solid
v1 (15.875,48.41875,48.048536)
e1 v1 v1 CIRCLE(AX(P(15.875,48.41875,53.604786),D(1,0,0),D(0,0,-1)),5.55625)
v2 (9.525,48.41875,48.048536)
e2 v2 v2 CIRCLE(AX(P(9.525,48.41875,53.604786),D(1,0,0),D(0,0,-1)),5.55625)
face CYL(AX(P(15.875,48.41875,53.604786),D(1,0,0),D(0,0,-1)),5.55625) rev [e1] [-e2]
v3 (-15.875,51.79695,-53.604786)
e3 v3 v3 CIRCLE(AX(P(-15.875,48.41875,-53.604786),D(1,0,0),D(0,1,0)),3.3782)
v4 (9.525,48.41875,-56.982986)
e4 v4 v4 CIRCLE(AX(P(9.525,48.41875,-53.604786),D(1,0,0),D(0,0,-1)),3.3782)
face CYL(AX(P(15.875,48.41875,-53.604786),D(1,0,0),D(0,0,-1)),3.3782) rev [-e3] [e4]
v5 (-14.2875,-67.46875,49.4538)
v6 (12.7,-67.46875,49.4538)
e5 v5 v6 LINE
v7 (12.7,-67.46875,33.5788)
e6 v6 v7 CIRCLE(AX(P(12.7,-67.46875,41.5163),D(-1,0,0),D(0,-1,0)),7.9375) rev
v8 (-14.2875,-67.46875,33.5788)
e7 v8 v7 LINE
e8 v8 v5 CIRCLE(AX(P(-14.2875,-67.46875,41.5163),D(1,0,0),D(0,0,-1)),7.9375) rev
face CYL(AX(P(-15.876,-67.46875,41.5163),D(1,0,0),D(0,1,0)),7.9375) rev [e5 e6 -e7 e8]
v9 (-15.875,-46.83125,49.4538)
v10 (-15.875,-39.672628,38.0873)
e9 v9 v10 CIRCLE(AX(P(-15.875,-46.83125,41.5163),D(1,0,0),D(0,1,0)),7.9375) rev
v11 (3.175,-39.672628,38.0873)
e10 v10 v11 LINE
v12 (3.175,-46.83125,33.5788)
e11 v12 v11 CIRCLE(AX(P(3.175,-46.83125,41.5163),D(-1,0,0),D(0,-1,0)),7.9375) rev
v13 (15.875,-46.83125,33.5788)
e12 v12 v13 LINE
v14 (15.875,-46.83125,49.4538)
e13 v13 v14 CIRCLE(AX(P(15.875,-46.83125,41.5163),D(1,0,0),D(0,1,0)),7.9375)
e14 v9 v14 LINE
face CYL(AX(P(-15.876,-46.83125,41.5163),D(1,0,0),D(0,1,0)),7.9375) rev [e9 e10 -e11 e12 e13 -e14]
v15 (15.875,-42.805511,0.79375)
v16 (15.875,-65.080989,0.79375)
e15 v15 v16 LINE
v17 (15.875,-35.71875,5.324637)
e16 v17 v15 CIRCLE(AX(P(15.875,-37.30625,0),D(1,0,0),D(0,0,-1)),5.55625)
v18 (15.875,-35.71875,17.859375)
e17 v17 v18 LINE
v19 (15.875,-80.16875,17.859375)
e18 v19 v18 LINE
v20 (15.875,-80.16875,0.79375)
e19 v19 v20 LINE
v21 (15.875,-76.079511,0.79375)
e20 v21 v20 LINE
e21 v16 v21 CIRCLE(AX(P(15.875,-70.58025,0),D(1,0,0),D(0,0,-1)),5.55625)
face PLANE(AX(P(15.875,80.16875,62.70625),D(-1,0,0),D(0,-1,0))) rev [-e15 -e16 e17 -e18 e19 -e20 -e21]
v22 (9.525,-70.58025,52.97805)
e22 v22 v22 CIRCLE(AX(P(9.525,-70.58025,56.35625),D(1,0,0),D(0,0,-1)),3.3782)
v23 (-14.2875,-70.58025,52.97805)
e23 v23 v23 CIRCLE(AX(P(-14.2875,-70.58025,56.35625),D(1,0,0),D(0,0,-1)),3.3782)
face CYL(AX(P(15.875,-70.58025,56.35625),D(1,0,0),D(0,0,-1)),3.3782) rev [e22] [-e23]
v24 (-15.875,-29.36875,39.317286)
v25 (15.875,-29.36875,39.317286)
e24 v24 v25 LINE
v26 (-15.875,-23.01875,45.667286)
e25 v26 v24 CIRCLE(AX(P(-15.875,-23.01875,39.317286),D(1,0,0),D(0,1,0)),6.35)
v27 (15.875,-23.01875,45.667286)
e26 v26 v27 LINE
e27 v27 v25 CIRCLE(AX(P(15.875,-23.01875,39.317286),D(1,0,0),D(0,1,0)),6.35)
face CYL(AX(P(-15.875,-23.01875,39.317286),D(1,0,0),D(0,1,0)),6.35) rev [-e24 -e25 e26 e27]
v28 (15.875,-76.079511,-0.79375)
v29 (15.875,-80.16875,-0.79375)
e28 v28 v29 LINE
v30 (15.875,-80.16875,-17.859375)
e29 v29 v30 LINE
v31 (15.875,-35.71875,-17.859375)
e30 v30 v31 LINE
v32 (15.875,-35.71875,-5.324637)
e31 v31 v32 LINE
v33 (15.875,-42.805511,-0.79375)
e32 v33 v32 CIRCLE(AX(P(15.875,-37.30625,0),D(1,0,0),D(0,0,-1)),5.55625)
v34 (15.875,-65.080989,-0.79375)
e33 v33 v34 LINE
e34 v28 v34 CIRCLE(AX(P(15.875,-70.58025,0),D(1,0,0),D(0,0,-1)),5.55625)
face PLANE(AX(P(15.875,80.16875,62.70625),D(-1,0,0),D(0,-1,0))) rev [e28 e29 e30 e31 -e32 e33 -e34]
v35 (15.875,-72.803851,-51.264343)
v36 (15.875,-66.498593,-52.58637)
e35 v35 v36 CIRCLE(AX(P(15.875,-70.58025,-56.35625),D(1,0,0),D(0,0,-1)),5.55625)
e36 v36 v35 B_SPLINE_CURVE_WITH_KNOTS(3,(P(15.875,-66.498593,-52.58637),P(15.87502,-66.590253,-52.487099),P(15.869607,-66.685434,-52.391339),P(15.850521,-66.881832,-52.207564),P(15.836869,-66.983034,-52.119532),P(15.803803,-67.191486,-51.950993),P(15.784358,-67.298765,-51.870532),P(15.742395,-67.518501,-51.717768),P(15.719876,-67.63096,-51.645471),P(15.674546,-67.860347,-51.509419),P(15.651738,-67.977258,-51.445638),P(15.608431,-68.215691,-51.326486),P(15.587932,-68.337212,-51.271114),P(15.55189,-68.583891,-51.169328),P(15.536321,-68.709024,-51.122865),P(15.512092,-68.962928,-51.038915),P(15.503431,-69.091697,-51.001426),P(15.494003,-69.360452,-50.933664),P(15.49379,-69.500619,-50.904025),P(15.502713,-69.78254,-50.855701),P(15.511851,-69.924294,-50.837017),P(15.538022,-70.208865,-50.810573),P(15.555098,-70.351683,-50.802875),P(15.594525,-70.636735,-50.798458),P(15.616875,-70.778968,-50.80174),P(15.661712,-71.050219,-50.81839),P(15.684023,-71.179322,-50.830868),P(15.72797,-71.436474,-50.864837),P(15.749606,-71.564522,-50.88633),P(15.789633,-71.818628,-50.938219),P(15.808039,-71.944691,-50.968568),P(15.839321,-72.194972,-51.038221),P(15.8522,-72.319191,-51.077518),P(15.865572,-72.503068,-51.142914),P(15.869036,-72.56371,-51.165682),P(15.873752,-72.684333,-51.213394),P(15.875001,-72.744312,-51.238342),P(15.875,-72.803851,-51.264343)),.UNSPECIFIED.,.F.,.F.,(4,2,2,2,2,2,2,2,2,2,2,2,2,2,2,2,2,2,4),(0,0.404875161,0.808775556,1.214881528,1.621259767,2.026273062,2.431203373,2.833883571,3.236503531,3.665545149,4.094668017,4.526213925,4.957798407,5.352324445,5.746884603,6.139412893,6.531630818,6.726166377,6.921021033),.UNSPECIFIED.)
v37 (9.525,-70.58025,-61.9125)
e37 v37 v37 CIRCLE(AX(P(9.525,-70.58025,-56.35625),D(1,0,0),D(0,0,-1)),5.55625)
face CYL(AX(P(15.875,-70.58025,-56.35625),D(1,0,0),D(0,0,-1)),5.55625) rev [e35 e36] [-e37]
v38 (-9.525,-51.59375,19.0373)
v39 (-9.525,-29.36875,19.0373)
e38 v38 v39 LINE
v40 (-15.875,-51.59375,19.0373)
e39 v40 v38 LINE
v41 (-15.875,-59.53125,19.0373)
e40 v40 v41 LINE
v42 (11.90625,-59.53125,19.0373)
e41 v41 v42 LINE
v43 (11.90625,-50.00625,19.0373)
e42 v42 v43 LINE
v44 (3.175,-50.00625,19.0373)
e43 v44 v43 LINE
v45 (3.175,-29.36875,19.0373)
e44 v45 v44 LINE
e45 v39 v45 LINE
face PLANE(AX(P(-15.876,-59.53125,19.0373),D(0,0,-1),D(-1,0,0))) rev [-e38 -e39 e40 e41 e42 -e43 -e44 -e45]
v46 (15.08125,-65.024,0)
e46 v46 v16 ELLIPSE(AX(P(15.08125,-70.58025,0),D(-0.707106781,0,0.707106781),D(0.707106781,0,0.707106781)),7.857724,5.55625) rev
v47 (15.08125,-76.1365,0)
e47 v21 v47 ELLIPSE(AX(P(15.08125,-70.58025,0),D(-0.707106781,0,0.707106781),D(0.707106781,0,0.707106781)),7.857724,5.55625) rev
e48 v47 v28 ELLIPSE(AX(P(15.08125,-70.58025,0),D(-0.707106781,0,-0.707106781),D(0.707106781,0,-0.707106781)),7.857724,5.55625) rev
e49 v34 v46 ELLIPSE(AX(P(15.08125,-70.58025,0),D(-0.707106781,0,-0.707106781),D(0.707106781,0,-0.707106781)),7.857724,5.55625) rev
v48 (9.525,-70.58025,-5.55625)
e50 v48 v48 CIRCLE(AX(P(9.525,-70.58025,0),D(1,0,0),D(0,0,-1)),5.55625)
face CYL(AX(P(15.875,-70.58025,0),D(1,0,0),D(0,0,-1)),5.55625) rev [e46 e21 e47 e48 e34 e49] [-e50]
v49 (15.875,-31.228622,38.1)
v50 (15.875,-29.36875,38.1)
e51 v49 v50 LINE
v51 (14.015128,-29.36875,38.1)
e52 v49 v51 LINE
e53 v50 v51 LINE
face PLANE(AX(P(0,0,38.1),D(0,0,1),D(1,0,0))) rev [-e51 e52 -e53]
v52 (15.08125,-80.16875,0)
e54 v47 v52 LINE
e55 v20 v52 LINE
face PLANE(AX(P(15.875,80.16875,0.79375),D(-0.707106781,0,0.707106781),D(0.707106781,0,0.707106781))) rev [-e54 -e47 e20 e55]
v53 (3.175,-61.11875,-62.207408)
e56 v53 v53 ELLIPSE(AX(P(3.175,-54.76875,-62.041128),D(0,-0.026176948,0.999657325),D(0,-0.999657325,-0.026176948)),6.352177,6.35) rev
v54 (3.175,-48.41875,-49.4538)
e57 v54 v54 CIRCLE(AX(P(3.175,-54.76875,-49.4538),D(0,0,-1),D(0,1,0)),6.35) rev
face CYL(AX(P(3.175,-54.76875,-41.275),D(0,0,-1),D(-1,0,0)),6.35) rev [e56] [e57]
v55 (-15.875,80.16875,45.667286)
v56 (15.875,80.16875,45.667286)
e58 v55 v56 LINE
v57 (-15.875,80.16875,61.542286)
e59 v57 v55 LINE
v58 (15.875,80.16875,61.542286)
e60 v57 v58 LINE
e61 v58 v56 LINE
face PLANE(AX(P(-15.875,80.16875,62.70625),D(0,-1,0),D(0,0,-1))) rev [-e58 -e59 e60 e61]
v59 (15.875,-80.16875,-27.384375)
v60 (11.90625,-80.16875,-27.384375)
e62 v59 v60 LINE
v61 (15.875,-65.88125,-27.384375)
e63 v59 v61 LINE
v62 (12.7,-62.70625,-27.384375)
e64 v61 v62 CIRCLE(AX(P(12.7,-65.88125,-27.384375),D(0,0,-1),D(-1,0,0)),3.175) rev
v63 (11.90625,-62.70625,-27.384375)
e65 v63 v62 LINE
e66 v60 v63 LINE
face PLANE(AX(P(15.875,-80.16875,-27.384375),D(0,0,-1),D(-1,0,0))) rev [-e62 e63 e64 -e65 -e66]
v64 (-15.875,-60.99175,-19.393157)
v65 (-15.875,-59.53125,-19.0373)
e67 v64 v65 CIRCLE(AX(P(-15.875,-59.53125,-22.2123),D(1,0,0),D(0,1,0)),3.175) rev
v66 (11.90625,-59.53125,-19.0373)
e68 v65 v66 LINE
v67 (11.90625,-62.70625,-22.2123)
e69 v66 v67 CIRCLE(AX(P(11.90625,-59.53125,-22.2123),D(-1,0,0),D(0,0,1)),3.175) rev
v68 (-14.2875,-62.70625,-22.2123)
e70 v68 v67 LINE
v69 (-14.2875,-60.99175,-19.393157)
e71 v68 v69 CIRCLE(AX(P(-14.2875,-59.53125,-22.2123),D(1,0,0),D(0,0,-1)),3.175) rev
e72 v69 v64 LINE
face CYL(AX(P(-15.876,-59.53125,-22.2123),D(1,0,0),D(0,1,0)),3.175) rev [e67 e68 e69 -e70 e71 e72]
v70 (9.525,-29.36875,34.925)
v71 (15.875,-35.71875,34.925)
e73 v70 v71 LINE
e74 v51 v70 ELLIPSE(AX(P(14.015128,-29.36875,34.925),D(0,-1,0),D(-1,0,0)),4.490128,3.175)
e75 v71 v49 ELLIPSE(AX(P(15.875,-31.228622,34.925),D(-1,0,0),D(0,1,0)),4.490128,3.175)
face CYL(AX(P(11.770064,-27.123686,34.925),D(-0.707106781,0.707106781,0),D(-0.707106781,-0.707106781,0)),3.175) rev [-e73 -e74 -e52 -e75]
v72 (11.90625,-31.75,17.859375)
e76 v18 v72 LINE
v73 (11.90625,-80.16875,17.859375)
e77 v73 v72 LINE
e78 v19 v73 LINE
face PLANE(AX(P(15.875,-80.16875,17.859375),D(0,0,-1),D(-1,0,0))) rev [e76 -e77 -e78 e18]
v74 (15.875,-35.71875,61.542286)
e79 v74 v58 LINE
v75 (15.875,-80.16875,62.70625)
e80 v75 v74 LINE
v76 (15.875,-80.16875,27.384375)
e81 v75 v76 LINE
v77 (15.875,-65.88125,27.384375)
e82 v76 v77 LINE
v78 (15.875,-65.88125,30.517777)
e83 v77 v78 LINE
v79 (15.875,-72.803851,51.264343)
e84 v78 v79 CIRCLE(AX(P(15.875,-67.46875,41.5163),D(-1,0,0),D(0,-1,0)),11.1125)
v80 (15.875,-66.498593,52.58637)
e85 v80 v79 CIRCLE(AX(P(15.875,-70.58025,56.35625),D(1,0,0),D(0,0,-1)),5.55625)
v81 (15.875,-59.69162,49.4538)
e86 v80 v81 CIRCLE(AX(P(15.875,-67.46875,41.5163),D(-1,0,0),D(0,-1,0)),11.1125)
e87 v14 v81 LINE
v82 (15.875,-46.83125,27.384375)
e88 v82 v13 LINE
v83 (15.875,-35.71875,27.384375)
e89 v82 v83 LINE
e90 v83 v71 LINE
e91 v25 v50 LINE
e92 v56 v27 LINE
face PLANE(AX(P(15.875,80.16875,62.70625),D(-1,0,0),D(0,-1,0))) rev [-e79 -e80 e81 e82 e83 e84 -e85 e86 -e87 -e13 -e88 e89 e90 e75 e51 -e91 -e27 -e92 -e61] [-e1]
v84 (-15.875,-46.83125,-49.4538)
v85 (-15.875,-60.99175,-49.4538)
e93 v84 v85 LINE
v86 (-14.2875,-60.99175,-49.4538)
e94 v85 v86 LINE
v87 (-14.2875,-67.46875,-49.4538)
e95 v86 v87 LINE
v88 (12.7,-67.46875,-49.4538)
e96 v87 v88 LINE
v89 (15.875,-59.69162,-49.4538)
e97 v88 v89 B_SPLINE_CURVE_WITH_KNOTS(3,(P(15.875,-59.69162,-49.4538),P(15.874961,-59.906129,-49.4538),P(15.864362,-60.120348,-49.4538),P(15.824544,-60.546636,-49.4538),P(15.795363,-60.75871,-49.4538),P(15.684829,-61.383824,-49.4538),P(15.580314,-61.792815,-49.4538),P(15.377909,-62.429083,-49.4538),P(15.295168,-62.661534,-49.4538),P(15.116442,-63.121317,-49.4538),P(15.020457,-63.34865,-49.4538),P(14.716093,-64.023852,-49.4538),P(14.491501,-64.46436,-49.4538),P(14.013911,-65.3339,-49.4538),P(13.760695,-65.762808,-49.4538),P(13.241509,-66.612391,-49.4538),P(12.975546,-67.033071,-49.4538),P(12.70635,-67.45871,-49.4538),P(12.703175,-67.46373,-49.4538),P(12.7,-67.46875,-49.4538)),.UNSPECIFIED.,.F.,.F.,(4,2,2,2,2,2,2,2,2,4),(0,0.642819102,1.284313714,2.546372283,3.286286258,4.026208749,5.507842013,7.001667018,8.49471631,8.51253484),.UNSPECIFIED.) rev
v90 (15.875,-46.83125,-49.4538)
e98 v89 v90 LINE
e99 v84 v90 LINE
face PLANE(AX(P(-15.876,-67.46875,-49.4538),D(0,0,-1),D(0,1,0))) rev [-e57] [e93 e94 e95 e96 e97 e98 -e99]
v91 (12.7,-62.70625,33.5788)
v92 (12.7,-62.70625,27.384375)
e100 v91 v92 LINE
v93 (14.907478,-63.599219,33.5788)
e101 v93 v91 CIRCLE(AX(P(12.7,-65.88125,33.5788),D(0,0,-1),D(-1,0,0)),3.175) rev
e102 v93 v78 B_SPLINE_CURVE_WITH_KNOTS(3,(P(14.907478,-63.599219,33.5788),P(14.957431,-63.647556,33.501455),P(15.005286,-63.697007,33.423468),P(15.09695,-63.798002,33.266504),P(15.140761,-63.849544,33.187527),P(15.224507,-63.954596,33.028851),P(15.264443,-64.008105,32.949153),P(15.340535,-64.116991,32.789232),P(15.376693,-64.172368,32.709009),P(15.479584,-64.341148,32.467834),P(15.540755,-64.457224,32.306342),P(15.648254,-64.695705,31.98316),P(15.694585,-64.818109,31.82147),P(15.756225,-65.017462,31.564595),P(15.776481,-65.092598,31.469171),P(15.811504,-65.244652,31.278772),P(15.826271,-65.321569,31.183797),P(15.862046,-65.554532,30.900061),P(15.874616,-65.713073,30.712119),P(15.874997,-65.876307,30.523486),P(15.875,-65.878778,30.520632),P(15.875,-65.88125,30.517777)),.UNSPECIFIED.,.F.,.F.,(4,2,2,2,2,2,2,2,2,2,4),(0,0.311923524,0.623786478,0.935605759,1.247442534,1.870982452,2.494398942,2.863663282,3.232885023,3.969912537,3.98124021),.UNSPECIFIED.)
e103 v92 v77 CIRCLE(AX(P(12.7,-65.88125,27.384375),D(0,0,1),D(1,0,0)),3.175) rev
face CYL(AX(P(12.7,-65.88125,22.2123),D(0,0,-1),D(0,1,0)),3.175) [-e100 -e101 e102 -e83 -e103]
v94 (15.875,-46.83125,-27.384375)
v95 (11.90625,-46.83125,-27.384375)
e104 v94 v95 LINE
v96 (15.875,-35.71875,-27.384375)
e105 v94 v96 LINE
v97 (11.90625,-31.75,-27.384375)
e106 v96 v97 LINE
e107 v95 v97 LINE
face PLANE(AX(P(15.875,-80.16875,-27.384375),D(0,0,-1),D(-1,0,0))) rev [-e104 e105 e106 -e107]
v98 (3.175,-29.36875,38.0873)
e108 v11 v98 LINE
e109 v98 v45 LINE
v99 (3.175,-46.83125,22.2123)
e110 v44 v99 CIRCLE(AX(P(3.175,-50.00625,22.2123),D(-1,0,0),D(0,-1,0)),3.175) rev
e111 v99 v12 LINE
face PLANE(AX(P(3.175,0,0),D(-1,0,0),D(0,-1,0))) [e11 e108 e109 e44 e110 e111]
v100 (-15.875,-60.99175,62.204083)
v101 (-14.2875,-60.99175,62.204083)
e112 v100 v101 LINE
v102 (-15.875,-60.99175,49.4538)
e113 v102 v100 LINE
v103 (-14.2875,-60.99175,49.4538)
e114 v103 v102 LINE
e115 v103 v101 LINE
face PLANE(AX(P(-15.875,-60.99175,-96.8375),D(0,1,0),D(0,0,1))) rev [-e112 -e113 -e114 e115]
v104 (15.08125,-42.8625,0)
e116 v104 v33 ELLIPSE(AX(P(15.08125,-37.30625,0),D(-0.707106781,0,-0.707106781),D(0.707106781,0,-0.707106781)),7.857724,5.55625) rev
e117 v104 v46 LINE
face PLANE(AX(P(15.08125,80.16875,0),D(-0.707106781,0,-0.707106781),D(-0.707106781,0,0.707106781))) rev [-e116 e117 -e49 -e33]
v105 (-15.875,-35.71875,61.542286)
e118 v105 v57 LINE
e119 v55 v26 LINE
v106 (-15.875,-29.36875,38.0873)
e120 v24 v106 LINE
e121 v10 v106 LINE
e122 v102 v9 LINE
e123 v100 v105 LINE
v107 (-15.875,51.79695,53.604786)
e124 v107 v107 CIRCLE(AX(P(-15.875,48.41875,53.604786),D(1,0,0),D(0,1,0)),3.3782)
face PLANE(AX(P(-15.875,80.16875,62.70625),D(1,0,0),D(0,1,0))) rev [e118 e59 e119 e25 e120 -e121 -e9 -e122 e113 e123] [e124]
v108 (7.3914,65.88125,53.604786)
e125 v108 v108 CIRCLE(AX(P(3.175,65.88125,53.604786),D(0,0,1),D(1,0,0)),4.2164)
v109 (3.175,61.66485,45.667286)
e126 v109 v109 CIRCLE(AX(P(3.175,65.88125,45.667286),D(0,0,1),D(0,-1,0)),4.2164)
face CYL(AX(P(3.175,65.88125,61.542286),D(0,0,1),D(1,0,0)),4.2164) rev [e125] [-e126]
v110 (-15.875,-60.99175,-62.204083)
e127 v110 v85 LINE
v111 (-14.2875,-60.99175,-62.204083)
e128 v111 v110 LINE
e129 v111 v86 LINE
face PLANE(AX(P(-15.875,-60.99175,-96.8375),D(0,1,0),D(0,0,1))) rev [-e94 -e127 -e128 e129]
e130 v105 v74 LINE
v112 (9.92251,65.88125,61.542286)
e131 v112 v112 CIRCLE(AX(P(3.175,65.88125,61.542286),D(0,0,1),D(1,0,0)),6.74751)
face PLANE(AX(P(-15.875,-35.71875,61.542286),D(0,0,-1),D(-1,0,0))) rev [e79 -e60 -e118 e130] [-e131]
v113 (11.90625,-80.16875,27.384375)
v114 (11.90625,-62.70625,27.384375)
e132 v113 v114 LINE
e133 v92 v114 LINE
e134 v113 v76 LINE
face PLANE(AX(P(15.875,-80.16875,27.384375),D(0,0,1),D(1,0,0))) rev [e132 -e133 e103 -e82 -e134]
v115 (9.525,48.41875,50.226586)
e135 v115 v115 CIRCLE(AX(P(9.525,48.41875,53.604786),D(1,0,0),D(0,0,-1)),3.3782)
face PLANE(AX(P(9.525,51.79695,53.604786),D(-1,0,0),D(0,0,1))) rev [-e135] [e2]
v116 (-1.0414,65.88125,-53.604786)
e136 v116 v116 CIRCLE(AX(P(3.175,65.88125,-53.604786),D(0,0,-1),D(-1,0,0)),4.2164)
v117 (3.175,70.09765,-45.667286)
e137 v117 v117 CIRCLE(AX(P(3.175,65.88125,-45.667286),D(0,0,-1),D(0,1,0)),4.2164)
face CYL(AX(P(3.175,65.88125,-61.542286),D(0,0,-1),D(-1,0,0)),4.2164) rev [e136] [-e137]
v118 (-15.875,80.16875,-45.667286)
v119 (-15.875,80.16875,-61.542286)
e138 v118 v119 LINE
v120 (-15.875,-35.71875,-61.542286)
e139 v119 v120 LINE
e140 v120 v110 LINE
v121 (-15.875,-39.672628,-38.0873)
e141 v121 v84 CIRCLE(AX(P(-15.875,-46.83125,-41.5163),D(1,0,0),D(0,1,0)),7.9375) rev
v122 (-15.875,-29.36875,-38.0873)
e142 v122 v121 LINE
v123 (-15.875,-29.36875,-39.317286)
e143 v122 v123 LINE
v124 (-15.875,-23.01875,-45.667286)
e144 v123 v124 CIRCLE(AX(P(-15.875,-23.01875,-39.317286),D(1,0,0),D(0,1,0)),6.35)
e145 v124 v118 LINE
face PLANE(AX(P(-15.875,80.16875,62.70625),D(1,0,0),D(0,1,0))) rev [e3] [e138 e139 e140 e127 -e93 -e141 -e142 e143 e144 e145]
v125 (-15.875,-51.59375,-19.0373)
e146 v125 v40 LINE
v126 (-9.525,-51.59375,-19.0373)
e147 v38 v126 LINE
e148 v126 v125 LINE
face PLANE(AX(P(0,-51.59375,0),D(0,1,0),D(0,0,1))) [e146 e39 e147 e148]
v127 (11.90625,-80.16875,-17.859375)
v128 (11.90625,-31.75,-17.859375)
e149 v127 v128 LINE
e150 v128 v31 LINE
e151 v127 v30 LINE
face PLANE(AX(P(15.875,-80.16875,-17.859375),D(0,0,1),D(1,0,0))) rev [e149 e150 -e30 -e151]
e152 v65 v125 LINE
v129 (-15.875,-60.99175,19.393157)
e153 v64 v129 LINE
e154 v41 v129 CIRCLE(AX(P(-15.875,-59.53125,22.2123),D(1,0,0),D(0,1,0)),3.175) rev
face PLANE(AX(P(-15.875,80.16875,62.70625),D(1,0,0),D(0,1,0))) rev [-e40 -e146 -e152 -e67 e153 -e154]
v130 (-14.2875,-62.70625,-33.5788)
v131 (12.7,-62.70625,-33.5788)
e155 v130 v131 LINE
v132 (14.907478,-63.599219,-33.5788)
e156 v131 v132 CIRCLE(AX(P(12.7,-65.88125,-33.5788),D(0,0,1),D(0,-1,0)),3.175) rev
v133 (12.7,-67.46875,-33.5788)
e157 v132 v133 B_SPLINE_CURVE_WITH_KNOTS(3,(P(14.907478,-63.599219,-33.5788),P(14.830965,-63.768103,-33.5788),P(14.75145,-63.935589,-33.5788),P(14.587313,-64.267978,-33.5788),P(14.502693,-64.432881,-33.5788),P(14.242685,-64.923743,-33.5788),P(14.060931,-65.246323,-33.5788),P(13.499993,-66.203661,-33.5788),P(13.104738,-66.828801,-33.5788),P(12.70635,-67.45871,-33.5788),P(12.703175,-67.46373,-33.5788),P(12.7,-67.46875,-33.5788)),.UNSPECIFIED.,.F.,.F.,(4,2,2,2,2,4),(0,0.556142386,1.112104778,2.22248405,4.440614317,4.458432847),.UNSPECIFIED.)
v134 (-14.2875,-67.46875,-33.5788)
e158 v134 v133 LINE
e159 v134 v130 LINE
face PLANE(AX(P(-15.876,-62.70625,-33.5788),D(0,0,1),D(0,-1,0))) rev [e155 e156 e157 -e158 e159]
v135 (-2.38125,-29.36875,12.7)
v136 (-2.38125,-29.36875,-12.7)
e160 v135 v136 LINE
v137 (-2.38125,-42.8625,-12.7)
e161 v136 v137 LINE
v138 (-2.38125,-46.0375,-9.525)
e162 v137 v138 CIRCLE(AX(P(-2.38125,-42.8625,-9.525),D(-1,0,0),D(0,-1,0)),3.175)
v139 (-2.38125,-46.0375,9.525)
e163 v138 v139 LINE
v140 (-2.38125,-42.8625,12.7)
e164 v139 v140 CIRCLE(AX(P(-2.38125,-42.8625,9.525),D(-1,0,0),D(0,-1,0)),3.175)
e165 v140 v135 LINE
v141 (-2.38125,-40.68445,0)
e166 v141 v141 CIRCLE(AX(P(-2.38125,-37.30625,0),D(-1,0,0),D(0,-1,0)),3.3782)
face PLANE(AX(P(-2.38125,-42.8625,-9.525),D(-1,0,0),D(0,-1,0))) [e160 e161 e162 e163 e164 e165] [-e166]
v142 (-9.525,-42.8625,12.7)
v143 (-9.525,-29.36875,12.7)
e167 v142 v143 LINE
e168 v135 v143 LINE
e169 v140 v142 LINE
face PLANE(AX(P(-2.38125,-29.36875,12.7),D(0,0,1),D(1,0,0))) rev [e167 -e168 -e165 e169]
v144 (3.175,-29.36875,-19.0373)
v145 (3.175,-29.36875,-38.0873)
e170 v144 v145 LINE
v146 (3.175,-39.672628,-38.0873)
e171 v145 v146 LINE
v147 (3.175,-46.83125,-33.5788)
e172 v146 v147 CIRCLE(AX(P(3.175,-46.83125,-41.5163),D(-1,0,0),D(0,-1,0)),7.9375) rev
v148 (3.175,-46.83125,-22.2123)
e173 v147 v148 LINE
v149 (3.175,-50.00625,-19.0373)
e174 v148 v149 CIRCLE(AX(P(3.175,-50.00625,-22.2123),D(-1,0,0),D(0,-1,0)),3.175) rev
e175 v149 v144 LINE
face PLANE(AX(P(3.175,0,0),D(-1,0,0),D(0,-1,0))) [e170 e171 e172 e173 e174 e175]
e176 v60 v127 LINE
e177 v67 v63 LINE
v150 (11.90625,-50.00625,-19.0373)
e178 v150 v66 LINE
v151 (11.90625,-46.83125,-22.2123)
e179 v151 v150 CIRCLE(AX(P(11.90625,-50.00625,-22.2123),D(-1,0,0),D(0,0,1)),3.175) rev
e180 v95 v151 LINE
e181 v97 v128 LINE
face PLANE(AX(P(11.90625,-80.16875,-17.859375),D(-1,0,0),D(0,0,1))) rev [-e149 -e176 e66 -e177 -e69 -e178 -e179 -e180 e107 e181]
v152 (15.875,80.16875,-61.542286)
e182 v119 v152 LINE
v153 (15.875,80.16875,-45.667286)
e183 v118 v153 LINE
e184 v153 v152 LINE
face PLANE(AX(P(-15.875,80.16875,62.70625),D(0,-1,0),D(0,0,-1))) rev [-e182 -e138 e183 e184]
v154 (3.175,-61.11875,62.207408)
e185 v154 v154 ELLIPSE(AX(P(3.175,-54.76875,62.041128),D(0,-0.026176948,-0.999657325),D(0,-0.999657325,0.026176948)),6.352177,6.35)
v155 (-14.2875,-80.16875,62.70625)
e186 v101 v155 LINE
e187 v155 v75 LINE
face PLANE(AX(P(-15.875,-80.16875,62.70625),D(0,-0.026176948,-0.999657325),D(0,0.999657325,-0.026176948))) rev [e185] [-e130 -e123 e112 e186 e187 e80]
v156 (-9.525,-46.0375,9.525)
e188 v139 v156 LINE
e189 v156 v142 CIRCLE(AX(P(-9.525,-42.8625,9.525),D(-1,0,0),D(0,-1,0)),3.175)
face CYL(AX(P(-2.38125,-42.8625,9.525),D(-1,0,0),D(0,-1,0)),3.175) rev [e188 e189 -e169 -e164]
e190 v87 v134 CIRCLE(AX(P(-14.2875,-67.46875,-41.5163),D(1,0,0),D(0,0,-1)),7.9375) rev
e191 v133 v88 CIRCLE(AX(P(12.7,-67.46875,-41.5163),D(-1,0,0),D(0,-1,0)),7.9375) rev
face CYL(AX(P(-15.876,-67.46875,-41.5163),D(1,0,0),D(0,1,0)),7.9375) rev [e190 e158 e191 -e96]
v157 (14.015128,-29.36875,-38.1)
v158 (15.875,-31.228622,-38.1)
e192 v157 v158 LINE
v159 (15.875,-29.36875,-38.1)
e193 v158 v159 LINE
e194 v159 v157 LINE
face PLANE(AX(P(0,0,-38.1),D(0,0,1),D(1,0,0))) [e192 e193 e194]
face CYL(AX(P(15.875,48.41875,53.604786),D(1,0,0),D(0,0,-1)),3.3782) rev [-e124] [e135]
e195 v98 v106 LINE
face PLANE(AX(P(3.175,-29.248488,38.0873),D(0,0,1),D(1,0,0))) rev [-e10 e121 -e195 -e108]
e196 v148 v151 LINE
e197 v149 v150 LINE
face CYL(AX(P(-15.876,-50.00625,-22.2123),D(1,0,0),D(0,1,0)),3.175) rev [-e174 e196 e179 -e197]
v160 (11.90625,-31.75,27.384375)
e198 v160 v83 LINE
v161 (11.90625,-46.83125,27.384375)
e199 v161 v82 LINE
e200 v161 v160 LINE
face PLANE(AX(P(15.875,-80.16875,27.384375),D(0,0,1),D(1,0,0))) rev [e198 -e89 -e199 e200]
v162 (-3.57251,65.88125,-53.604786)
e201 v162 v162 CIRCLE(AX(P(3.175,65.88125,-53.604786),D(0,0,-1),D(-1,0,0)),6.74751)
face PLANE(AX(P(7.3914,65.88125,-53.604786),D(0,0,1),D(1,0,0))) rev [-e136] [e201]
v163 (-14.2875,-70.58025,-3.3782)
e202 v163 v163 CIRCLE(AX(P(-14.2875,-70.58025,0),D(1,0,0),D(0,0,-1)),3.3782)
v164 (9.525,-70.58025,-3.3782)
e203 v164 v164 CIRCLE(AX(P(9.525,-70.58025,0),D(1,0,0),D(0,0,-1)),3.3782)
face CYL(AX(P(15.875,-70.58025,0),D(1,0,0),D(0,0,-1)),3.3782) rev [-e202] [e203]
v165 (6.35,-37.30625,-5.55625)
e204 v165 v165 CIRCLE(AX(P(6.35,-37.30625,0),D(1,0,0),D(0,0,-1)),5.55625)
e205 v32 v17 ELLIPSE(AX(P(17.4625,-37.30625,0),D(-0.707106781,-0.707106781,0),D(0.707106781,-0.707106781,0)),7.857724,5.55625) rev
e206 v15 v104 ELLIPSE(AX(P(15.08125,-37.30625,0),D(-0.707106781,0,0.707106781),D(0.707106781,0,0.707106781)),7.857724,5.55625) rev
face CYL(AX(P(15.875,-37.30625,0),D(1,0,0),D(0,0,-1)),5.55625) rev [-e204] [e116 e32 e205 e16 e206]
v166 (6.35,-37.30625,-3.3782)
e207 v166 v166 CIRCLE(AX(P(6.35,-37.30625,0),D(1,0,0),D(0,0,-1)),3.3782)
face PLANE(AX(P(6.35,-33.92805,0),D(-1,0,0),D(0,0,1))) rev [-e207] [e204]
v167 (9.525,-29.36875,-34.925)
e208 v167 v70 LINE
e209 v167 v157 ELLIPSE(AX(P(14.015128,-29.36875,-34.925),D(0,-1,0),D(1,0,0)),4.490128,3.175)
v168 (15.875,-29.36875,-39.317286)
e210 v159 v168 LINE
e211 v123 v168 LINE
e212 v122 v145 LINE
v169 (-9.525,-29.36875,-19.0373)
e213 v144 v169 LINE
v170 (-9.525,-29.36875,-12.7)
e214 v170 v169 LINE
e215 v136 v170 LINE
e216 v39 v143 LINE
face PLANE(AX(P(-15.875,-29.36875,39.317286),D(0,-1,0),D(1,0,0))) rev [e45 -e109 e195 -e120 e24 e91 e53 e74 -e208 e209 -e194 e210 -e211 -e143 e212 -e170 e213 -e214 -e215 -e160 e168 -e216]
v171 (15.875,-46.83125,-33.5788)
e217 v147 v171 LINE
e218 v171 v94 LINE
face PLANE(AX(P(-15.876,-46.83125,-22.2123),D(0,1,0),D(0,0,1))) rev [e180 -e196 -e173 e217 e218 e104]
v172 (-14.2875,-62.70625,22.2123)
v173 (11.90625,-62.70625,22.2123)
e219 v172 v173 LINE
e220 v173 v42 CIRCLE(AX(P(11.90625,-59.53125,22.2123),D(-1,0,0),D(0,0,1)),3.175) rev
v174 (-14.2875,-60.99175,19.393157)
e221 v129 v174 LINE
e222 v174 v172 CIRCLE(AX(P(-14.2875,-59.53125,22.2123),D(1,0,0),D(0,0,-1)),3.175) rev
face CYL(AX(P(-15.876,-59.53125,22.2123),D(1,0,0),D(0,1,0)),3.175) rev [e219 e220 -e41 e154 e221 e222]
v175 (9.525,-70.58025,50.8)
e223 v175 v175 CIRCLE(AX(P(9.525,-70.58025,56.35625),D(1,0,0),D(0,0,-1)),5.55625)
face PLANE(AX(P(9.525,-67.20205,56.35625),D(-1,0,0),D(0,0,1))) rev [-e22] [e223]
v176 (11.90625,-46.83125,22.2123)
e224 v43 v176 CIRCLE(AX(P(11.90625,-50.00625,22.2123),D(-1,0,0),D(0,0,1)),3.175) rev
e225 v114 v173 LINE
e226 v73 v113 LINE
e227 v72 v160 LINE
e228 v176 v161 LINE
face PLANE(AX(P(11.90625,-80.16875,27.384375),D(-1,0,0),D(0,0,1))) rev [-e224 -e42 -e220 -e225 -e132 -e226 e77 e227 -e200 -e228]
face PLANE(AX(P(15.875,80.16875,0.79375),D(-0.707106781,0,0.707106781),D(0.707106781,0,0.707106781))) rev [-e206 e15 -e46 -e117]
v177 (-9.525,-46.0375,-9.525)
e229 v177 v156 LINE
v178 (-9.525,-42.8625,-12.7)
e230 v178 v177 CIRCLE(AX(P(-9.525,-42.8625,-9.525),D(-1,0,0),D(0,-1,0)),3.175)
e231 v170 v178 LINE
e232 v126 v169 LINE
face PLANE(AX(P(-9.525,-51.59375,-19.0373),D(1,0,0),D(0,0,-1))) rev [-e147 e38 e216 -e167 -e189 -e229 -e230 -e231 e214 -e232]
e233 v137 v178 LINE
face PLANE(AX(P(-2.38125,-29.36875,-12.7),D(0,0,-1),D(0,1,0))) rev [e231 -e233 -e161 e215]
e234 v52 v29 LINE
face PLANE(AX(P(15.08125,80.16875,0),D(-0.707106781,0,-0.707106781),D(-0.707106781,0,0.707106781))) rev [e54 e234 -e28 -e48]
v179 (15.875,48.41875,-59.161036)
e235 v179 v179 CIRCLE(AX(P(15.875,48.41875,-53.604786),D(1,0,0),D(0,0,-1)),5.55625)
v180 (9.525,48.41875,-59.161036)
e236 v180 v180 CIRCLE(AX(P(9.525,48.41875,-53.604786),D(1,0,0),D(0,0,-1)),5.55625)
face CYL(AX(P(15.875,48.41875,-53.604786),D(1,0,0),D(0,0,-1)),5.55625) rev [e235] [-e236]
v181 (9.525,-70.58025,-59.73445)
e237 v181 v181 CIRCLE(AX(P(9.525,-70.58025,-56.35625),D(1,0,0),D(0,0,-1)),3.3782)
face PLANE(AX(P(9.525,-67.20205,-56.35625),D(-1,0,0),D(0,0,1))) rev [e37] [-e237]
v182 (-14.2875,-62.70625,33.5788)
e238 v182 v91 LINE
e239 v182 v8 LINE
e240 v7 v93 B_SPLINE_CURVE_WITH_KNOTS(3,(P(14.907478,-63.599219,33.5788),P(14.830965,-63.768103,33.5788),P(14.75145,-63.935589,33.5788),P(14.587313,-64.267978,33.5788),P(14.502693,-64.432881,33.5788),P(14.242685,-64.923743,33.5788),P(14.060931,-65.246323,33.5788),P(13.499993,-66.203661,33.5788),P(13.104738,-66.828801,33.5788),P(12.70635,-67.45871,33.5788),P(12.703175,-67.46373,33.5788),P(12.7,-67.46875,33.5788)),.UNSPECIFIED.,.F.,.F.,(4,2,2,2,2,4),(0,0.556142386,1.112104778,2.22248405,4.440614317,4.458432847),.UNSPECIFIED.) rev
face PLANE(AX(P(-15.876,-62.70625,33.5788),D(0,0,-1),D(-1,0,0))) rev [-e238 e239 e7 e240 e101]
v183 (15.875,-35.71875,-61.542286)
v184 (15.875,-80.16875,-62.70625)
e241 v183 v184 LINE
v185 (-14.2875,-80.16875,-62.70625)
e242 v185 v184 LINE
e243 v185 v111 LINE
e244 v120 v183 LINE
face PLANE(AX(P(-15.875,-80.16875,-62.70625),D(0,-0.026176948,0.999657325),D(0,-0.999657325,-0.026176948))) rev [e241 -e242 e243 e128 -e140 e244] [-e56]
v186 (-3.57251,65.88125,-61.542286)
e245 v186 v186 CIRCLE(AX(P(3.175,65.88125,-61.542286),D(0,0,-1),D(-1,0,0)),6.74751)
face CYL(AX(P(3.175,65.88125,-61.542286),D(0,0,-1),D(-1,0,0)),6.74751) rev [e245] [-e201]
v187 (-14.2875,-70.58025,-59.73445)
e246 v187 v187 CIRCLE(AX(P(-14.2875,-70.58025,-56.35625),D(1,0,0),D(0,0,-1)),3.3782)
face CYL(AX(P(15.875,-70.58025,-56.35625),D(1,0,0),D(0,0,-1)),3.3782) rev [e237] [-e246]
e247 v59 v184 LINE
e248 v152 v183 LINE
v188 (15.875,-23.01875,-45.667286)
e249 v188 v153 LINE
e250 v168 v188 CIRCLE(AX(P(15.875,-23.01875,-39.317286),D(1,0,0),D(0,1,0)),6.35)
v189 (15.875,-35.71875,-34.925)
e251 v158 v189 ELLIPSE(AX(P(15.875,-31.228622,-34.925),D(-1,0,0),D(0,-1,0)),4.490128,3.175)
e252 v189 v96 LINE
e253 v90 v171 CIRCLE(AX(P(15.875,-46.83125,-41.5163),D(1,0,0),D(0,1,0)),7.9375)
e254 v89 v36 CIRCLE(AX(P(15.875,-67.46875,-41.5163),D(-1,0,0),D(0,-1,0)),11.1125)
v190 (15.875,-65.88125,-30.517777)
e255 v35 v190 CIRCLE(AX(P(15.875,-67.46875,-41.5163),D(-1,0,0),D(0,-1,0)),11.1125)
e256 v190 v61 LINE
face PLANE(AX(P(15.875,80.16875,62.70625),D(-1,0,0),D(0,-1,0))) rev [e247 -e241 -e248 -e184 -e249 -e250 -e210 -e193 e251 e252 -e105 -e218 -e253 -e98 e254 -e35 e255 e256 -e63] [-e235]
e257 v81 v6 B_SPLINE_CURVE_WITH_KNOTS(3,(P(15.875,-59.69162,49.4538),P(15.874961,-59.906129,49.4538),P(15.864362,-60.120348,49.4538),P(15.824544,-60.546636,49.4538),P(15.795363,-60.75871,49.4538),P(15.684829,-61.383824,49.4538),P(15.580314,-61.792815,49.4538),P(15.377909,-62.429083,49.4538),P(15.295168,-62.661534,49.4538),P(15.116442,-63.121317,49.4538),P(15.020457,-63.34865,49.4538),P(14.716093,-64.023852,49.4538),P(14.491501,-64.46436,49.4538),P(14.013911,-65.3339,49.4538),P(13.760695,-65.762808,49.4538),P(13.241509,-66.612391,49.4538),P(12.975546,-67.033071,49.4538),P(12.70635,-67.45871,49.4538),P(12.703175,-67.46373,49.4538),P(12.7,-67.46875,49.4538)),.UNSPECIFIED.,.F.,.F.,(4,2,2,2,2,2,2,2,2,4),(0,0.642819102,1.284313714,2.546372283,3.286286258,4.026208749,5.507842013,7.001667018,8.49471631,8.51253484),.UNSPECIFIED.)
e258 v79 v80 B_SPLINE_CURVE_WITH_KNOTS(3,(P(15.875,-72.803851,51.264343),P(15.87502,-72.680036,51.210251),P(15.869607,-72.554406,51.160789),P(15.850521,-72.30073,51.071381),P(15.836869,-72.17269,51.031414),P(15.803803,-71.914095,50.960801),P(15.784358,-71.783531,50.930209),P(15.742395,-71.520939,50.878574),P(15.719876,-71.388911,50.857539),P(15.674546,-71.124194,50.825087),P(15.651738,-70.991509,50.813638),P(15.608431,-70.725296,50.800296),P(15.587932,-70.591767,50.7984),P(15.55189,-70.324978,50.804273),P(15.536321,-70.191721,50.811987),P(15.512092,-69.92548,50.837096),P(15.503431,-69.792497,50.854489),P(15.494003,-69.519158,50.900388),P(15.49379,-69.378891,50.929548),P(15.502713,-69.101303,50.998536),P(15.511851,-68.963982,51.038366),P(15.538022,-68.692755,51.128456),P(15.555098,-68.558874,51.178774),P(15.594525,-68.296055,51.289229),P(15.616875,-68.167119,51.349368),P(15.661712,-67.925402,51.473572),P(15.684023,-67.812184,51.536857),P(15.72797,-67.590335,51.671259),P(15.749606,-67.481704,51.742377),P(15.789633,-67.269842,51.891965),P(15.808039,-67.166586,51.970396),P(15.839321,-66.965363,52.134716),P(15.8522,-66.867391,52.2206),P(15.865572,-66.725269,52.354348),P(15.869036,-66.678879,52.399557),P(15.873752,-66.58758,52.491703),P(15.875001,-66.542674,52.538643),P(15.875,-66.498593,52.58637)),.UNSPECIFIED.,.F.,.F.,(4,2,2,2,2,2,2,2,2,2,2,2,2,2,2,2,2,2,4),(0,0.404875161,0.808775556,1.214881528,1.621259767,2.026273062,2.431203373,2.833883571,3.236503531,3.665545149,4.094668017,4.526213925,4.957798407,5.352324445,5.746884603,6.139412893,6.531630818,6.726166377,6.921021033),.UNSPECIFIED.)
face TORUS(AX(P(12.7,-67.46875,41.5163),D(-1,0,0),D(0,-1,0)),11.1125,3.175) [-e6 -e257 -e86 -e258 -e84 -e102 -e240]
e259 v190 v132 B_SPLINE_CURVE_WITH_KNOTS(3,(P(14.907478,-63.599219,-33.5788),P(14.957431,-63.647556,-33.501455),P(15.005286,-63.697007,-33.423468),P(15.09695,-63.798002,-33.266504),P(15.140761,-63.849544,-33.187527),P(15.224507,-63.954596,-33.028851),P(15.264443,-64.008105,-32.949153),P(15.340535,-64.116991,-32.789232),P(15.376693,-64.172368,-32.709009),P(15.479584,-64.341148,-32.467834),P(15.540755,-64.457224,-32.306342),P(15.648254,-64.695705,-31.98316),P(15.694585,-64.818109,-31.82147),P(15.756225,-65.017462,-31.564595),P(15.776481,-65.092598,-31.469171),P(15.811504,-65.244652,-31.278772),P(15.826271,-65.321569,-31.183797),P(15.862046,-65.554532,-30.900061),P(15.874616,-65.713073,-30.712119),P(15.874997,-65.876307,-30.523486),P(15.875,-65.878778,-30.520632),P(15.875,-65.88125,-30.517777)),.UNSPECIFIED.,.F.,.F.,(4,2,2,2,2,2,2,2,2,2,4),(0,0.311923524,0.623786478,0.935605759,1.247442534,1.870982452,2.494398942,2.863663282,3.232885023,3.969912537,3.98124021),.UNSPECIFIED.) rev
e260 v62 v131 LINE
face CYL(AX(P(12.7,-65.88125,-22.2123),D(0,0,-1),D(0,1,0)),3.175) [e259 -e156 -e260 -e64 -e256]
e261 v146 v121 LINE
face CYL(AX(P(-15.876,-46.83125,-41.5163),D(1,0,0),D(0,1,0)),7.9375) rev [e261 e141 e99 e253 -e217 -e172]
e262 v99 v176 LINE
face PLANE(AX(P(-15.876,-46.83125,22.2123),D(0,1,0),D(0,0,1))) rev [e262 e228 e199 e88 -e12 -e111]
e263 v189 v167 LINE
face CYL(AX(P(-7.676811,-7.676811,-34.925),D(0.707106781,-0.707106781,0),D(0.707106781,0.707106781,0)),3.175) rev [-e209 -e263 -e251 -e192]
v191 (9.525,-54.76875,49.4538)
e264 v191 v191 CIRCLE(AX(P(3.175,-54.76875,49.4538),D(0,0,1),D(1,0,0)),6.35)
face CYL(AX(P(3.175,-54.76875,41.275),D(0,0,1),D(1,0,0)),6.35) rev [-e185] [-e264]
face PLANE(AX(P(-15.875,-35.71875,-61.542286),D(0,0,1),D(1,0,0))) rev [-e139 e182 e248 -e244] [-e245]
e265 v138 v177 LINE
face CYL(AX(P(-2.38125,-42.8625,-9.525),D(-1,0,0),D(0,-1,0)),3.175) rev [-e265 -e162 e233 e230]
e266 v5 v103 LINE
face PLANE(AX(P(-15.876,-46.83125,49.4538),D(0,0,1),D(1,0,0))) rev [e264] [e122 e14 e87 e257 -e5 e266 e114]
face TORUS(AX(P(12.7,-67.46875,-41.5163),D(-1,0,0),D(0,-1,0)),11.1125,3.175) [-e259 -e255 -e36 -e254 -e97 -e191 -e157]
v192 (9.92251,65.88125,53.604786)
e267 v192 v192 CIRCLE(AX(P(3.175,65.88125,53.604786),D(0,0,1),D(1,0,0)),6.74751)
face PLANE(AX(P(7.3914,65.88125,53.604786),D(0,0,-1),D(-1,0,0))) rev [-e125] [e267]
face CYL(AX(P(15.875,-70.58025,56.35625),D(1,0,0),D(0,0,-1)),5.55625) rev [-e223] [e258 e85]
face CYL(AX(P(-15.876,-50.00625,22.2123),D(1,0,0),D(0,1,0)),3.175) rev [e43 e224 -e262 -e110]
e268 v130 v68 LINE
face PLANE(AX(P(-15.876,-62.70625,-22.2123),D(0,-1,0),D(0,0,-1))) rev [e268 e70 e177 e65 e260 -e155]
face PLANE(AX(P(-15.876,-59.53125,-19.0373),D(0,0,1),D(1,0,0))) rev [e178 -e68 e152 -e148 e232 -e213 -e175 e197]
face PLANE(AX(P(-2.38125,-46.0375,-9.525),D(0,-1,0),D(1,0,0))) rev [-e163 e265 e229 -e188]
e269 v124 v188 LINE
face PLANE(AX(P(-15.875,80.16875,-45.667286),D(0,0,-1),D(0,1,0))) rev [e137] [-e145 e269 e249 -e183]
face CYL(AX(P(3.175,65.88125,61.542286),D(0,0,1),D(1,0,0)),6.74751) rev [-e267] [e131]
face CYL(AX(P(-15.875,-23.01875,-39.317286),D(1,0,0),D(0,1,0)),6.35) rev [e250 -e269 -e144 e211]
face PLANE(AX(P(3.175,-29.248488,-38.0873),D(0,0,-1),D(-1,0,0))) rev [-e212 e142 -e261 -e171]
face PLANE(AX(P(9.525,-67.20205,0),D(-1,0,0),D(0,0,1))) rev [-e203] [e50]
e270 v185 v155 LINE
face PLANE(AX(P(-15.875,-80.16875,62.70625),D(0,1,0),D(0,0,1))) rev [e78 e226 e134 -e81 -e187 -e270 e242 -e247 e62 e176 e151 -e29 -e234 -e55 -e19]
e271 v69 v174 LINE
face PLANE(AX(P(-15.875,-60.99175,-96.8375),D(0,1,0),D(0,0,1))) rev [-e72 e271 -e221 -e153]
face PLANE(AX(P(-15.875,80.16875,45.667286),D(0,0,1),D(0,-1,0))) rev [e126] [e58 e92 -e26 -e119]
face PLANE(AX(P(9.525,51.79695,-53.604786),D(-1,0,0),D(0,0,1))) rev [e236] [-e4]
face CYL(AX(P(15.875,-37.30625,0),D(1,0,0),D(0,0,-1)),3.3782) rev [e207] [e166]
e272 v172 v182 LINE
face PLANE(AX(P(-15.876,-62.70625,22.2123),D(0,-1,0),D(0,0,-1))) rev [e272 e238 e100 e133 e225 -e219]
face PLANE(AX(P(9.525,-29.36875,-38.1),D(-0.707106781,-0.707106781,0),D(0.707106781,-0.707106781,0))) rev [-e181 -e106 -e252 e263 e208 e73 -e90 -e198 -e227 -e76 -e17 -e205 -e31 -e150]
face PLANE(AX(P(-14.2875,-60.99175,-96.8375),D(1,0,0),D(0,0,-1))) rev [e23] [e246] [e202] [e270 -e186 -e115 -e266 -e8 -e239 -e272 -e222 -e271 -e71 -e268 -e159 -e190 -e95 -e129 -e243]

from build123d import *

# Parameters (mm, degrees)
SKETCH1_W                                         = 31.75
SKETCH1_H                                         = 160.3375
EXTRUDE1_DEPTH                                    = 62.70625
EXTRUDE2_DEPTH                                    = 107.616906566
EXTRUDE3_REACH                                    = 108.617
SKETCH15_W                                        = 3.96875
SKETCH15_H                                        = 9.525
EXTRUDE6_DEPTH                                    = 173.893618507
CUT_EXTRUDE1_DEPTH                                = 107.616906566
SKETCH17_W                                        = 1.5875
SKETCH17_H                                        = 19.177
CUT_EXTRUDE2_DEPTH                                = 96.8375
CBORE_FOR_1_4_SOCKET_HEAD_CAP_SCREW4_D            = 6.7564
CBORE_FOR_1_4_SOCKET_HEAD_CAP_SCREW4_CBORE_D      = 11.1125
CBORE_FOR_1_4_SOCKET_HEAD_CAP_SCREW4_CBORE_DEPTH  = 6.35
CBORE_FOR_5_16_SOCKET_HEAD_CAP_SCREW2_D           = 8.4328
CBORE_FOR_5_16_SOCKET_HEAD_CAP_SCREW2_DEPTH       = 15.875
CBORE_FOR_5_16_SOCKET_HEAD_CAP_SCREW2_CBORE_D     = 13.49502
CBORE_FOR_5_16_SOCKET_HEAD_CAP_SCREW2_CBORE_DEPTH = 7.9375
CBORE_FOR_5_16_SOCKET_HEAD_CAP_SCREW3_D           = 8.4328
CBORE_FOR_5_16_SOCKET_HEAD_CAP_SCREW3_CBORE_D     = 13.49502
CBORE_FOR_5_16_SOCKET_HEAD_CAP_SCREW3_CBORE_DEPTH = 7.9375
CBORE_FOR_1_4_SOCKET_HEAD_CAP_SCREW2_D            = 6.7564
CBORE_FOR_1_4_SOCKET_HEAD_CAP_SCREW2_CBORE_D      = 11.1125
CBORE_FOR_1_4_SOCKET_HEAD_CAP_SCREW2_CBORE_DEPTH  = 6.35
FILLET1_R                                         = 3.175
SKETCH32_R                                        = 6.35
CUT_EXTRUDE7_DEPTH                                = 22.225
CUT_EXTRUDE8_START                                = 22.225
SKETCH33_R                                        = 6.35
CUT_EXTRUDE8_DEPTH                                = 22.225
SKETCH41_W                                        = 19.05
SKETCH41_H                                        = 25.520262047
CUT_EXTRUDE9_DEPTH                                = 19.05
SKETCH43_W                                        = 6.35
SKETCH43_H                                        = 38.0746
CUT_EXTRUDE11_DEPTH                               = 22.225
CUT_EXTRUDE12_DEPTH                               = 7.14375
CBORE_FOR_1_4_SOCKET_HEAD_CAP_SCREW5_D            = 6.7564
CBORE_FOR_1_4_SOCKET_HEAD_CAP_SCREW5_CBORE_D      = 11.1125
CBORE_FOR_1_4_SOCKET_HEAD_CAP_SCREW5_CBORE_DEPTH  = 9.525
FILLET2_R                                         = 3.175
FILLET3_R                                         = 3.175
CUT_EXTRUDE13_DEPTH                               = 173.893618516
CUT_EXTRUDE14_DEPTH                               = 38.1
FILLET4_R                                         = 3.175


with BuildPart() as part:
    # Sketch1 → Extrude1 (new, symmetric)
    with BuildSketch(Plane.XY):
        Rectangle(SKETCH1_W, SKETCH1_H)
    extrude(amount=EXTRUDE1_DEPTH, both=True)

    # Sketch2 → Extrude2 (cut, through all)
    with BuildSketch(Plane(origin=(15.875, 0, 0), x_dir=(0, 0, -1), z_dir=(1, 0, 0))):
        Polygon((-62.70625, -80.16875), (-61.542285786, -35.71875), (-61.542285786, 80.16875), (-62.70625, 80.16875), align=None)
        Polygon((62.70625, -80.16875), (61.542285786, -35.71875), (61.542285786, 80.16875), (62.70625, 80.16875), align=None)
    extrude(amount=-EXTRUDE2_DEPTH, mode=Mode.SUBTRACT)

    # Sketch3 → Extrude3 (cut, up to next)
    with BuildSketch(Plane(origin=(15.875, 0, 0), x_dir=(0, 0, -1), z_dir=(1, 0, 0)), mode=Mode.PRIVATE) as extrude3_sk1:
        with BuildLine():
            Line((-19.0373, -59.53125), (-19.0373, -50.00625))
            ThreePointArc((-19.0373, -50.00625), (-19.96723597, -47.76118597), (-22.2123, -46.83125))
            Line((-22.2123, -46.83125), (-33.5788, -46.83125))
            ThreePointArc((-33.5788, -46.83125), (-41.5163, -38.89375), (-49.4538, -46.83125))
            Line((-49.4538, -46.83125), (-49.4538, -67.46875))
            ThreePointArc((-49.4538, -67.46875), (-41.5163, -75.40625), (-33.5788, -67.46875))
            Line((-33.5788, -67.46875), (-33.5788, -62.70625))
            Line((-33.5788, -62.70625), (-22.2123, -62.70625))
            ThreePointArc((-22.2123, -62.70625), (-19.96723597, -61.77631403), (-19.0373, -59.53125))
        make_face()
    extrude3_tool1 = extrude(extrude3_sk1.sketch, amount=-EXTRUDE3_REACH, mode=Mode.PRIVATE) & part.part
    # Sketch3 → Extrude3 (cut, up to next)
    with BuildSketch(Plane(origin=(15.875, 0, 0), x_dir=(0, 0, -1), z_dir=(1, 0, 0)), mode=Mode.PRIVATE) as extrude3_sk2:
        with BuildLine():
            Line((49.4538, -67.46875), (49.4538, -46.83125))
            ThreePointArc((49.4538, -46.83125), (41.5163, -38.89375), (33.5788, -46.83125))
            Line((33.5788, -46.83125), (22.2123, -46.83125))
            ThreePointArc((22.2123, -46.83125), (19.96723597, -47.76118597), (19.0373, -50.00625))
            Line((19.0373, -50.00625), (19.0373, -59.53125))
            ThreePointArc((19.0373, -59.53125), (19.96723597, -61.77631403), (22.2123, -62.70625))
            Line((22.2123, -62.70625), (33.5788, -62.70625))
            Line((33.5788, -62.70625), (33.5788, -67.46875))
            ThreePointArc((33.5788, -67.46875), (41.5163, -75.40625), (49.4538, -67.46875))
        make_face()
    extrude3_tool2 = extrude(extrude3_sk2.sketch, amount=-EXTRUDE3_REACH, mode=Mode.PRIVATE) & part.part
    add(extrude3_tool1.solids().sort_by_distance((15.875, -56.432782, 36.973416))[0], mode=Mode.SUBTRACT)
    add(extrude3_tool2.solids().sort_by_distance((15.875, -56.432782, -36.973416))[0], mode=Mode.SUBTRACT)

    # Sketch15 → Extrude6 (cut, through all)
    with BuildSketch(Plane(origin=(0, 80.16875, 0), x_dir=(1, 0, 0), z_dir=(0, 1, 0))):
        with Locations((13.890625, -22.621875)):
            Rectangle(SKETCH15_W, SKETCH15_H)
        with Locations((13.890625, 22.621875)):
            Rectangle(SKETCH15_W, SKETCH15_H)
    extrude(amount=-EXTRUDE6_DEPTH, mode=Mode.SUBTRACT)

    # Sketch16 → Cut-Extrude1 (cut, through all)
    with BuildSketch(Plane(origin=(15.875, 0, 0), x_dir=(0, 0, -1), z_dir=(1, 0, 0))):
        with BuildLine():
            Line((-45.667285786, 80.16875), (45.667285786, 80.16875))
            Line((45.667285786, 80.16875), (45.667285786, -23.01875))
            ThreePointArc((45.667285786, -23.01875), (43.807413847, -27.508878061), (39.317285786, -29.36875))
            Line((39.317285786, -29.36875), (-39.317285786, -29.36875))
            ThreePointArc((-39.317285786, -29.36875), (-43.807413847, -27.508878061), (-45.667285786, -23.01875))
            Line((-45.667285786, -23.01875), (-45.667285786, 80.16875))
        make_face()
    extrude(amount=-CUT_EXTRUDE1_DEPTH, mode=Mode.SUBTRACT)

    # Sketch17 → Cut-Extrude2 (cut, symmetric)
    with BuildSketch(Plane.XY):
        with Locations((-15.08125, -70.58025)):
            Rectangle(SKETCH17_W, SKETCH17_H)
    extrude(amount=CUT_EXTRUDE2_DEPTH, both=True, mode=Mode.SUBTRACT)

    # CBORE for 1/4 Socket Head Cap Screw4 (through all)
    with Locations(Plane(origin=(15.875, 0, 0), x_dir=(0, 0, -1), z_dir=(1, 0, 0))):
        with Locations((-56.35625, -70.58025), (56.35625, -70.58025), (0, -70.58025)):
            CounterBoreHole(CBORE_FOR_1_4_SOCKET_HEAD_CAP_SCREW4_D / 2, CBORE_FOR_1_4_SOCKET_HEAD_CAP_SCREW4_CBORE_D / 2, CBORE_FOR_1_4_SOCKET_HEAD_CAP_SCREW4_CBORE_DEPTH)

    # CBORE for 5/16 Socket Head Cap Screw2
    with Locations(Plane(origin=(0, 0, -61.542285786), x_dir=(-1, 0, 0), z_dir=(0, 0, -1))):
        with Locations((-3.175, 65.88125)):
            CounterBoreHole(CBORE_FOR_5_16_SOCKET_HEAD_CAP_SCREW2_D / 2, CBORE_FOR_5_16_SOCKET_HEAD_CAP_SCREW2_CBORE_D / 2, CBORE_FOR_5_16_SOCKET_HEAD_CAP_SCREW2_CBORE_DEPTH, depth=CBORE_FOR_5_16_SOCKET_HEAD_CAP_SCREW2_DEPTH)

    # CBORE for 5/16 Socket Head Cap Screw3 (through all)
    with Locations(Plane.XY.offset(61.542285786)):
        with Locations((3.175, 65.88125)):
            CounterBoreHole(CBORE_FOR_5_16_SOCKET_HEAD_CAP_SCREW3_D / 2, CBORE_FOR_5_16_SOCKET_HEAD_CAP_SCREW3_CBORE_D / 2, CBORE_FOR_5_16_SOCKET_HEAD_CAP_SCREW3_CBORE_DEPTH)

    # CBORE for 1/4 Socket Head Cap Screw2 (through all)
    with Locations(Plane(origin=(15.875, 0, 0), x_dir=(0, 0, -1), z_dir=(1, 0, 0))):
        with Locations((53.604785786, 48.41875), (-53.604785786, 48.41875)):
            CounterBoreHole(CBORE_FOR_1_4_SOCKET_HEAD_CAP_SCREW2_D / 2, CBORE_FOR_1_4_SOCKET_HEAD_CAP_SCREW2_CBORE_D / 2, CBORE_FOR_1_4_SOCKET_HEAD_CAP_SCREW2_CBORE_DEPTH)

    # Fillet1
    fillet1_edges = [part.edges().sort_by_distance(p)[0] for p in [
        (15.875, -62.70625, -30.4815875),
        (15.875, -62.70625, 30.4815875),
    ]]
    fillet(fillet1_edges, radius=FILLET1_R)

    # Sketch32 → Cut-Extrude7 (cut)
    with BuildSketch(Plane.XY.offset(63.5)):
        with Locations((3.175, -54.76875)):
            Circle(SKETCH32_R)
    extrude(amount=-CUT_EXTRUDE7_DEPTH, mode=Mode.SUBTRACT)

    # Sketch33 → Cut-Extrude8 (cut)
    with BuildSketch(Plane.XY.offset(-63.5).offset(CUT_EXTRUDE8_START)):
        with Locations((3.175, -54.76875)):
            Circle(SKETCH33_R)
    extrude(amount=-CUT_EXTRUDE8_DEPTH, mode=Mode.SUBTRACT)

    # Sketch41 → Cut-Extrude9 (cut)
    with BuildSketch(Plane.ZY.offset(15.875)):
        with Locations((-28.5623, -42.008618977)):
            Rectangle(SKETCH41_W, SKETCH41_H)
        with Locations((28.5623, -42.008618977)):
            Rectangle(SKETCH41_W, SKETCH41_H)
    extrude(amount=-CUT_EXTRUDE9_DEPTH, mode=Mode.SUBTRACT)

    # Sketch43 → Cut-Extrude11 (cut)
    with BuildSketch(Plane(origin=(0, -29.36875, 0), x_dir=(1, 0, 0), z_dir=(0, 1, 0))):
        with Locations((-12.7, 0)):
            Rectangle(SKETCH43_W, SKETCH43_H)
    extrude(amount=-CUT_EXTRUDE11_DEPTH, mode=Mode.SUBTRACT)

    # Sketch44 → Cut-Extrude12 (cut)
    with BuildSketch(Plane.ZY.offset(9.525)):
        with BuildLine():
            Line((-12.7, -29.36875), (12.7, -29.36875))
            Line((12.7, -29.36875), (12.7, -42.8625))
            ThreePointArc((12.7, -42.8625), (11.77006403, -45.10756403), (9.525, -46.0375))
            Line((9.525, -46.0375), (-9.525, -46.0375))
            ThreePointArc((-9.525, -46.0375), (-11.77006403, -45.10756403), (-12.7, -42.8625))
            Line((-12.7, -42.8625), (-12.7, -29.36875))
        make_face()
    extrude(amount=-CUT_EXTRUDE12_DEPTH, mode=Mode.SUBTRACT)

    # CBORE for 1/4 Socket Head Cap Screw5 (through all)
    with Locations(Plane(origin=(15.875, 0, 0), x_dir=(0, 0, -1), z_dir=(1, 0, 0))):
        with Locations((0, -37.30625)):
            CounterBoreHole(CBORE_FOR_1_4_SOCKET_HEAD_CAP_SCREW5_D / 2, CBORE_FOR_1_4_SOCKET_HEAD_CAP_SCREW5_CBORE_D / 2, CBORE_FOR_1_4_SOCKET_HEAD_CAP_SCREW5_CBORE_DEPTH)

    # Fillet2
    # the kernel refuses this fillet: 3.175 mm, written as the material it takes off along each edge
    with BuildSketch(Plane(origin=(15.875, -67.46875, -41.5163), x_dir=(0, 0.842338804567458, 0.5389483633149522), z_dir=(0, 0.5389483633149522, -0.842338804567458))) as fillet2_piece_1:
        with BuildLine():
            CenterArc((7.9375 + FILLET2_R, -FILLET2_R), FILLET2_R, 90, 90)
            Line((7.9375, -FILLET2_R), (7.9375, 0))
            Line((7.9375, 0), (7.9375 + FILLET2_R, 0))
        make_face()
    revolve(axis=Axis((15.875, -67.46875, -41.5163), (1, 0, 0)), revolution_arc=294.775843921, mode=Mode.SUBTRACT)

    # Fillet3
    # the kernel refuses this fillet: 3.175 mm, written as the material it takes off along each edge
    with BuildSketch(Plane(origin=(15.875, -67.46875, 41.5163), x_dir=(0, 0.842338804567458, 0.5389483633149522), z_dir=(0, 0.5389483633149522, -0.842338804567458))) as fillet3_piece_1:
        with BuildLine():
            CenterArc((7.9375 + FILLET3_R, -FILLET3_R), FILLET3_R, 90, 90)
            Line((7.9375, -FILLET3_R), (7.9375, 0))
            Line((7.9375, 0), (7.9375 + FILLET3_R, 0))
        make_face()
    revolve(axis=Axis((15.875, -67.46875, 41.5163), (1, 0, 0)), revolution_arc=294.775843921, mode=Mode.SUBTRACT)

    # Sketch48 → Cut-Extrude13 (cut, through all)
    with BuildSketch(Plane.XZ.offset(80.16875)):
        Polygon((15.875, 0.79375), (15.08125, 0), (15.875, -0.79375), align=None)
    extrude(amount=-CUT_EXTRUDE13_DEPTH, mode=Mode.SUBTRACT)

    # Sketch49 → Cut-Extrude14 (cut, symmetric)
    with BuildSketch(Plane.XY):
        Polygon((15.875, -29.36875), (9.525, -29.36875), (15.875, -35.71875), align=None)
    extrude(amount=CUT_EXTRUDE14_DEPTH, both=True, mode=Mode.SUBTRACT)

    # Fillet4
    fillet4_edges = [part.edges().sort_by_distance(p)[0] for p in [
        (12.7, -32.54375, -38.1),
        (12.7, -32.54375, 38.1),
    ]]
    fillet(fillet4_edges, radius=FILLET4_R)


solid = part.part
